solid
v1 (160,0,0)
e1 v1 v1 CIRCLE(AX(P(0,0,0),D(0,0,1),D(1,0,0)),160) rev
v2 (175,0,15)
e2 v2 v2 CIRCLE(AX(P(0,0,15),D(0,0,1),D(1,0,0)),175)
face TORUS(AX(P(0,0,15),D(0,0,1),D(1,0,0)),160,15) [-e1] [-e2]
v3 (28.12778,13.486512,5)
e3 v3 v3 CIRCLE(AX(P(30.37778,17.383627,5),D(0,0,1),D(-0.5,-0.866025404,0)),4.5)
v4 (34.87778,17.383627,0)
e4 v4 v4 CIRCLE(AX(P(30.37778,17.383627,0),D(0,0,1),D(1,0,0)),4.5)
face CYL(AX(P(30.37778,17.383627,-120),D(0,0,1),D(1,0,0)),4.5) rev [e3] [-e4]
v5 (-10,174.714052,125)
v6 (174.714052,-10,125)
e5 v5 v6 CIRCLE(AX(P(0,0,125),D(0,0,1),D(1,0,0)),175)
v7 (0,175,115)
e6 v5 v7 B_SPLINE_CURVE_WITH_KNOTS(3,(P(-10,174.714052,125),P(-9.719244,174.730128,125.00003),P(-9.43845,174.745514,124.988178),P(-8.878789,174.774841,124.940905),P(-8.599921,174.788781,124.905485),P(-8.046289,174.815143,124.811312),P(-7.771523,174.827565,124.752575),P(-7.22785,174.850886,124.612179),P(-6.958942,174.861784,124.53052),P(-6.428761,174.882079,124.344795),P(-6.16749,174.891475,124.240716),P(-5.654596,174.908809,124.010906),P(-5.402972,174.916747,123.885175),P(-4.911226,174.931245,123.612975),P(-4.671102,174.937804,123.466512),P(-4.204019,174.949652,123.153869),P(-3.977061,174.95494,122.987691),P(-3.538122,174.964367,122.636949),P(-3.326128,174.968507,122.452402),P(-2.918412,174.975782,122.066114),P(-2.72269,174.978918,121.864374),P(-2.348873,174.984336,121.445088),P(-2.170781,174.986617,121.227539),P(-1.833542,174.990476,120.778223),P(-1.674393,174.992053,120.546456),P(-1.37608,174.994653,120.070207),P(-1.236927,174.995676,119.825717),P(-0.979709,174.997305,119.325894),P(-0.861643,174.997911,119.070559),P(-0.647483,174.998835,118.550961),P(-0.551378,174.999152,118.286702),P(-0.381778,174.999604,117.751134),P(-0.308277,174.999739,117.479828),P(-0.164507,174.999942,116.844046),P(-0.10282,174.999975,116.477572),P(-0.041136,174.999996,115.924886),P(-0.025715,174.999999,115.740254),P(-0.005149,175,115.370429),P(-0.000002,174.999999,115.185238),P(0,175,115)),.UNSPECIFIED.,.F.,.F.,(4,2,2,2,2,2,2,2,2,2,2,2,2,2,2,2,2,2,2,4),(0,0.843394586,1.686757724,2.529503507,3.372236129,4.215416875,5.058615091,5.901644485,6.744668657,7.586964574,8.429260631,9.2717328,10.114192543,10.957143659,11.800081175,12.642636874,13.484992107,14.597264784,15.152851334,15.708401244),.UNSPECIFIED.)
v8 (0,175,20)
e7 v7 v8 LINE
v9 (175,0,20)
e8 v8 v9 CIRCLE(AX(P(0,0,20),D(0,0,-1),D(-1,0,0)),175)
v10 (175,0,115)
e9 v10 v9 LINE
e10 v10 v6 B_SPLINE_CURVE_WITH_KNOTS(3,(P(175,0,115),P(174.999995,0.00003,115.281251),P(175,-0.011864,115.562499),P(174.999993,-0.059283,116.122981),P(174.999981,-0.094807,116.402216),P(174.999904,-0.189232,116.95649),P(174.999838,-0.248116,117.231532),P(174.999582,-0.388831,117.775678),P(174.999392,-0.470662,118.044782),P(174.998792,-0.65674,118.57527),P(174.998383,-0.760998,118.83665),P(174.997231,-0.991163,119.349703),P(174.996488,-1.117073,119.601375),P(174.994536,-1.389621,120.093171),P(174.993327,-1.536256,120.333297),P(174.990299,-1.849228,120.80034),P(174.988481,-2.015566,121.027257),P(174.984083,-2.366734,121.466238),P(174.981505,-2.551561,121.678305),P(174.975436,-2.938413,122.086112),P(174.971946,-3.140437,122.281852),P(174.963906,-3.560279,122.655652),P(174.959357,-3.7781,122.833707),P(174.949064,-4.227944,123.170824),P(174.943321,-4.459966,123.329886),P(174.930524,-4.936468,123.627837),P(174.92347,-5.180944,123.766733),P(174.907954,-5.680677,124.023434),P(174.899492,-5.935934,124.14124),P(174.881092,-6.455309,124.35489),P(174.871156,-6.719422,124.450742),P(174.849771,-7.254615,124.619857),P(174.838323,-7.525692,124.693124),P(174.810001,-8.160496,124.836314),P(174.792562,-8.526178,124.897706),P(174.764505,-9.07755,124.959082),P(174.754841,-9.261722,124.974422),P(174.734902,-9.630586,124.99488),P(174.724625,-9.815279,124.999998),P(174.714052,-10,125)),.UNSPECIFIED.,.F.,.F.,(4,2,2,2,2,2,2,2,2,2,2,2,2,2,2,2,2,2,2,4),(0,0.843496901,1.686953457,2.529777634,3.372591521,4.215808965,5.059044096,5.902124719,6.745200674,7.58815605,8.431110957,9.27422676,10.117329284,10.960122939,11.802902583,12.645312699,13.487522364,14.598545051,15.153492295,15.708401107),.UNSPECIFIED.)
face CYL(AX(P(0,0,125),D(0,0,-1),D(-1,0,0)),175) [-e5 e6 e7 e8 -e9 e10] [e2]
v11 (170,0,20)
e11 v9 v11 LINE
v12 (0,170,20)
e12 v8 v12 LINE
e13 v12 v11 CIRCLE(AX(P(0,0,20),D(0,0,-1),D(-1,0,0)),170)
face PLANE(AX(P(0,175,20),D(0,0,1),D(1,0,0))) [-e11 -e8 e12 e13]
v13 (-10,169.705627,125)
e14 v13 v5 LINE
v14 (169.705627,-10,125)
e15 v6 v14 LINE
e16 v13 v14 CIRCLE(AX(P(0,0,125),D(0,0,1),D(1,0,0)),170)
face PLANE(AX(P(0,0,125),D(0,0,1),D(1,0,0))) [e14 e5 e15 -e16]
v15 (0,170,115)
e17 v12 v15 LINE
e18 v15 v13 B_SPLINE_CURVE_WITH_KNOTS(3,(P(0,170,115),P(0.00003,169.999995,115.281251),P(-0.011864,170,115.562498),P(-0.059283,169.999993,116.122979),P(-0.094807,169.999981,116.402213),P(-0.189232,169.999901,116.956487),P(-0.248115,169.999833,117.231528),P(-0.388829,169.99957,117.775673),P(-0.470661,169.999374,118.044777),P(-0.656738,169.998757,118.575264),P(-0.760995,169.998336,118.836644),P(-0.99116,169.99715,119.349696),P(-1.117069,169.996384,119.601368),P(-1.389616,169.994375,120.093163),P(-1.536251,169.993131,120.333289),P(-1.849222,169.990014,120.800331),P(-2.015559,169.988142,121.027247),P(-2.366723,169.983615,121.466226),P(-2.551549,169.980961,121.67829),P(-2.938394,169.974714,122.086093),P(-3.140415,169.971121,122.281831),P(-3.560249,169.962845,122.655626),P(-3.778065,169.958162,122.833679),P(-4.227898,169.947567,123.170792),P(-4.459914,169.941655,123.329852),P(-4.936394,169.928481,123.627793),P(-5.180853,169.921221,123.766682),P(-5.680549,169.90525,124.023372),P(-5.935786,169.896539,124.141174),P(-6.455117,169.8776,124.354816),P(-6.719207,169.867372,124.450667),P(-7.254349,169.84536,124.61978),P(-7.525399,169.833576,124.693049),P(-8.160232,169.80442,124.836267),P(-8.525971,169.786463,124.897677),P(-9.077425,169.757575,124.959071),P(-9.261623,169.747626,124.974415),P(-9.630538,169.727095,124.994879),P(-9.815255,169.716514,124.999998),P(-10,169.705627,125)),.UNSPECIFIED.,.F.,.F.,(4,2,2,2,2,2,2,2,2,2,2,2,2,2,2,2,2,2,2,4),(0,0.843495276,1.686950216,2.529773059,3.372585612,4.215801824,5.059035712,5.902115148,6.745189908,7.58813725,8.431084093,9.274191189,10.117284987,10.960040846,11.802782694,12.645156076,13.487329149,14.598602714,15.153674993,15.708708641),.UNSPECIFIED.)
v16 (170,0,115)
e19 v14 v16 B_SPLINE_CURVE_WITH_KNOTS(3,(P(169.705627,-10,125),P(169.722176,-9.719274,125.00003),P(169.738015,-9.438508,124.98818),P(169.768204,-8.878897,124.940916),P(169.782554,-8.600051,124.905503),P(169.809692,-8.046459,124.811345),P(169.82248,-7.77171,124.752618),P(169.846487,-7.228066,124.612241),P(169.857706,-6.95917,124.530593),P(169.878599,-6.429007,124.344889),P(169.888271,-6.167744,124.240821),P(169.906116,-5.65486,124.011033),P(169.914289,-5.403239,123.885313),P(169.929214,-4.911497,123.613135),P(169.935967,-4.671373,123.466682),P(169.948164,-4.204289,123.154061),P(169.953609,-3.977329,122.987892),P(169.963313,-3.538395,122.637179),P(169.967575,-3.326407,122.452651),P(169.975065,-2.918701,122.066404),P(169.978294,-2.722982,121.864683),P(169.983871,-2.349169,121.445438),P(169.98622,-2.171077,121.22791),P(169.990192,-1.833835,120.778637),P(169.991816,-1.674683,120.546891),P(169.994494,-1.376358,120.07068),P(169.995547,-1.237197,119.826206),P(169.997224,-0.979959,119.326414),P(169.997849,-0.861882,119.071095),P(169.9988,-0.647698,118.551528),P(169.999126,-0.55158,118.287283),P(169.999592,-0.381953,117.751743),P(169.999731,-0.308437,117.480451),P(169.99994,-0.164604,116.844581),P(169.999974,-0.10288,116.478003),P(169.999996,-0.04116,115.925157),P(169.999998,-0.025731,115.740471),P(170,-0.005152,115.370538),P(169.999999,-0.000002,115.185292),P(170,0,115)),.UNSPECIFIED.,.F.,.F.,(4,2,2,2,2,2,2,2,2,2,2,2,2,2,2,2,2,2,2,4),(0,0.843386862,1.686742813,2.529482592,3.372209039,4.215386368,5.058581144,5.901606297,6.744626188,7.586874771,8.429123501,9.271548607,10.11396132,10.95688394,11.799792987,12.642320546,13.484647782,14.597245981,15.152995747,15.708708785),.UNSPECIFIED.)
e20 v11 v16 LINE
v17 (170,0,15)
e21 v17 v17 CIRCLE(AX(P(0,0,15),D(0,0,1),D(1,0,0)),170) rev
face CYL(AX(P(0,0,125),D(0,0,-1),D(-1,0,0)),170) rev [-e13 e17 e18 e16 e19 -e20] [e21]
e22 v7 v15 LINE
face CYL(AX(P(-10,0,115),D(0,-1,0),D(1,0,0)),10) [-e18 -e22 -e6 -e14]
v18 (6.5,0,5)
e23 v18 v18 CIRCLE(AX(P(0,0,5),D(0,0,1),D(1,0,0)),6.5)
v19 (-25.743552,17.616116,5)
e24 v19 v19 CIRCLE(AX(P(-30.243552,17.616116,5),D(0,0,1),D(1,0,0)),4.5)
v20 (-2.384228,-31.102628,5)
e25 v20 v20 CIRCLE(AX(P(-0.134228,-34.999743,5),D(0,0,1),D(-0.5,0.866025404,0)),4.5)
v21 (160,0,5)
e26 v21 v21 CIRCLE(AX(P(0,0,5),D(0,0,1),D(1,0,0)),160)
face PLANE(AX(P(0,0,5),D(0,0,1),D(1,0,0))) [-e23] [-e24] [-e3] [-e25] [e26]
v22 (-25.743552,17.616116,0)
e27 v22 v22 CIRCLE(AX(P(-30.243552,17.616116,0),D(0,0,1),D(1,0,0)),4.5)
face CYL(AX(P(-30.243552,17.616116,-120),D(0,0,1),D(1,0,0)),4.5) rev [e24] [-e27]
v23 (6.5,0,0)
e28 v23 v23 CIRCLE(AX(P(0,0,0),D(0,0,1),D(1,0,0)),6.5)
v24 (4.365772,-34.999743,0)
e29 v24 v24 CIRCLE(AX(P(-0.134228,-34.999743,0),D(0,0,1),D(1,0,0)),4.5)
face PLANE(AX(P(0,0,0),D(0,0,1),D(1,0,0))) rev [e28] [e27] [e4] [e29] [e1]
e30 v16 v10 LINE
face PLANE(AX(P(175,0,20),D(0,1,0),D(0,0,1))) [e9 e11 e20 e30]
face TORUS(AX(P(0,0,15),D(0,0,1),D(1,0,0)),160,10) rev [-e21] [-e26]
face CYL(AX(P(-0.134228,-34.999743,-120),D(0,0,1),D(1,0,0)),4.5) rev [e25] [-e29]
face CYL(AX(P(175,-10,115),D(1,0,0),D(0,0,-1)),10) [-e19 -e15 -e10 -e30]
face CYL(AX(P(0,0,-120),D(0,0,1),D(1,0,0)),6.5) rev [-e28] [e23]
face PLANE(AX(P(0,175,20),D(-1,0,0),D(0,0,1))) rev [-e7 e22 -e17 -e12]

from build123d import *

# Parameters (mm, degrees)
SKETCH_1_R               = 175
EXTRUDE_1_DEPTH          = 125
SHELL_3_T                = -5
SKETCH_2_W               = 5
SKETCH_2_H               = 105
CUT_REVOLVE_1_ANGLE      = 90
FILLET_1_R               = 10
FILLET_2_R               = 15
SKETCH_3_R               = 6.5
CUT_EXTRUDE_1_DEPTH      = 125
FILLET_3_R               = 10
FILLET_START             = 169
FILLET_4_DEPTH           = 7
SKETCH_5_R               = 4.5
CUT_EXTRUDE_2_DEPTH      = 125
PATTERN_CIRCULAR_1_COUNT = 3


with BuildPart() as part:
    # 草图1 → 凸台-拉伸1 (new body)
    with BuildSketch(Plane.XY):
        Circle(SKETCH_1_R)
    extrude(amount=EXTRUDE_1_DEPTH)

    # 抽壳3
    shell_3_openings = [part.faces().sort_by_distance(p)[0] for p in [
        (0, 0, 125),
    ]]
    offset(amount=SHELL_3_T, openings=shell_3_openings, kind=Kind.INTERSECTION)

    # 草图2 → 切除-旋转1 (revolve, cut)
    with BuildSketch(Plane(origin=(0, 0, 0), x_dir=(1, 0, 0), z_dir=(0, 1, 0))):
        with Locations((172.5, -72.5)):
            Rectangle(SKETCH_2_W, SKETCH_2_H)
    revolve(axis=Axis((0, 0, 0), (0, 0, 1)), revolution_arc=CUT_REVOLVE_1_ANGLE, mode=Mode.SUBTRACT)

    # 圆角1
    fillet_1_edges = [part.edges().sort_by_distance(p)[0] for p in [
        (-170, 0, 5),
    ]]
    fillet(fillet_1_edges, radius=FILLET_1_R)

    # 圆角2
    fillet_2_edges = [part.edges().sort_by_distance(p)[0] for p in [
        (-175, 0, 0),
    ]]
    fillet(fillet_2_edges, radius=FILLET_2_R)

    # 草图3 → 切除-拉伸1 (cut)
    with BuildSketch(Plane.XY.offset(5)):
        Circle(SKETCH_3_R)
    extrude(amount=-CUT_EXTRUDE_1_DEPTH, mode=Mode.SUBTRACT)

    # 圆角3
    fillet_3_edges = [part.edges().sort_by_distance(p)[0] for p in [
        (0, 172.5, 125),
    ]]
    fillet(fillet_3_edges, radius=FILLET_3_R)

    # 圆角4: read off the stored shape, not the designer's step
    # 圆角4 outline → 圆角4 (cut)
    with BuildSketch(Plane.YZ.offset(FILLET_START)):
        with BuildLine():
            ThreePointArc((-10, 125), (-2.928932188, 122.071067812), (0, 115))
            Line((0, 115), (0, 125))
            Line((0, 125), (-10, 125))
        make_face()
    extrude(amount=FILLET_4_DEPTH, mode=Mode.SUBTRACT)

    # 草图5 → 切除-拉伸2 (cut)
    with BuildSketch(Plane.XY.offset(5)):
        with Locations((-30.243552325, 17.616115995)):
            Circle(SKETCH_5_R)
    cut_extrude_2 = extrude(amount=-CUT_EXTRUDE_2_DEPTH, mode=Mode.SUBTRACT)

    # 阵列(圆周)1: 切除-拉伸2 ×3 about axis
    pattern_circular_1_axis = Axis((0, 0, 0), (0, 0, 1))
    for i in range(1, PATTERN_CIRCULAR_1_COUNT):
        add(cut_extrude_2.rotate(pattern_circular_1_axis, i * 360 / PATTERN_CIRCULAR_1_COUNT), mode=Mode.SUBTRACT)


solid = part.part
